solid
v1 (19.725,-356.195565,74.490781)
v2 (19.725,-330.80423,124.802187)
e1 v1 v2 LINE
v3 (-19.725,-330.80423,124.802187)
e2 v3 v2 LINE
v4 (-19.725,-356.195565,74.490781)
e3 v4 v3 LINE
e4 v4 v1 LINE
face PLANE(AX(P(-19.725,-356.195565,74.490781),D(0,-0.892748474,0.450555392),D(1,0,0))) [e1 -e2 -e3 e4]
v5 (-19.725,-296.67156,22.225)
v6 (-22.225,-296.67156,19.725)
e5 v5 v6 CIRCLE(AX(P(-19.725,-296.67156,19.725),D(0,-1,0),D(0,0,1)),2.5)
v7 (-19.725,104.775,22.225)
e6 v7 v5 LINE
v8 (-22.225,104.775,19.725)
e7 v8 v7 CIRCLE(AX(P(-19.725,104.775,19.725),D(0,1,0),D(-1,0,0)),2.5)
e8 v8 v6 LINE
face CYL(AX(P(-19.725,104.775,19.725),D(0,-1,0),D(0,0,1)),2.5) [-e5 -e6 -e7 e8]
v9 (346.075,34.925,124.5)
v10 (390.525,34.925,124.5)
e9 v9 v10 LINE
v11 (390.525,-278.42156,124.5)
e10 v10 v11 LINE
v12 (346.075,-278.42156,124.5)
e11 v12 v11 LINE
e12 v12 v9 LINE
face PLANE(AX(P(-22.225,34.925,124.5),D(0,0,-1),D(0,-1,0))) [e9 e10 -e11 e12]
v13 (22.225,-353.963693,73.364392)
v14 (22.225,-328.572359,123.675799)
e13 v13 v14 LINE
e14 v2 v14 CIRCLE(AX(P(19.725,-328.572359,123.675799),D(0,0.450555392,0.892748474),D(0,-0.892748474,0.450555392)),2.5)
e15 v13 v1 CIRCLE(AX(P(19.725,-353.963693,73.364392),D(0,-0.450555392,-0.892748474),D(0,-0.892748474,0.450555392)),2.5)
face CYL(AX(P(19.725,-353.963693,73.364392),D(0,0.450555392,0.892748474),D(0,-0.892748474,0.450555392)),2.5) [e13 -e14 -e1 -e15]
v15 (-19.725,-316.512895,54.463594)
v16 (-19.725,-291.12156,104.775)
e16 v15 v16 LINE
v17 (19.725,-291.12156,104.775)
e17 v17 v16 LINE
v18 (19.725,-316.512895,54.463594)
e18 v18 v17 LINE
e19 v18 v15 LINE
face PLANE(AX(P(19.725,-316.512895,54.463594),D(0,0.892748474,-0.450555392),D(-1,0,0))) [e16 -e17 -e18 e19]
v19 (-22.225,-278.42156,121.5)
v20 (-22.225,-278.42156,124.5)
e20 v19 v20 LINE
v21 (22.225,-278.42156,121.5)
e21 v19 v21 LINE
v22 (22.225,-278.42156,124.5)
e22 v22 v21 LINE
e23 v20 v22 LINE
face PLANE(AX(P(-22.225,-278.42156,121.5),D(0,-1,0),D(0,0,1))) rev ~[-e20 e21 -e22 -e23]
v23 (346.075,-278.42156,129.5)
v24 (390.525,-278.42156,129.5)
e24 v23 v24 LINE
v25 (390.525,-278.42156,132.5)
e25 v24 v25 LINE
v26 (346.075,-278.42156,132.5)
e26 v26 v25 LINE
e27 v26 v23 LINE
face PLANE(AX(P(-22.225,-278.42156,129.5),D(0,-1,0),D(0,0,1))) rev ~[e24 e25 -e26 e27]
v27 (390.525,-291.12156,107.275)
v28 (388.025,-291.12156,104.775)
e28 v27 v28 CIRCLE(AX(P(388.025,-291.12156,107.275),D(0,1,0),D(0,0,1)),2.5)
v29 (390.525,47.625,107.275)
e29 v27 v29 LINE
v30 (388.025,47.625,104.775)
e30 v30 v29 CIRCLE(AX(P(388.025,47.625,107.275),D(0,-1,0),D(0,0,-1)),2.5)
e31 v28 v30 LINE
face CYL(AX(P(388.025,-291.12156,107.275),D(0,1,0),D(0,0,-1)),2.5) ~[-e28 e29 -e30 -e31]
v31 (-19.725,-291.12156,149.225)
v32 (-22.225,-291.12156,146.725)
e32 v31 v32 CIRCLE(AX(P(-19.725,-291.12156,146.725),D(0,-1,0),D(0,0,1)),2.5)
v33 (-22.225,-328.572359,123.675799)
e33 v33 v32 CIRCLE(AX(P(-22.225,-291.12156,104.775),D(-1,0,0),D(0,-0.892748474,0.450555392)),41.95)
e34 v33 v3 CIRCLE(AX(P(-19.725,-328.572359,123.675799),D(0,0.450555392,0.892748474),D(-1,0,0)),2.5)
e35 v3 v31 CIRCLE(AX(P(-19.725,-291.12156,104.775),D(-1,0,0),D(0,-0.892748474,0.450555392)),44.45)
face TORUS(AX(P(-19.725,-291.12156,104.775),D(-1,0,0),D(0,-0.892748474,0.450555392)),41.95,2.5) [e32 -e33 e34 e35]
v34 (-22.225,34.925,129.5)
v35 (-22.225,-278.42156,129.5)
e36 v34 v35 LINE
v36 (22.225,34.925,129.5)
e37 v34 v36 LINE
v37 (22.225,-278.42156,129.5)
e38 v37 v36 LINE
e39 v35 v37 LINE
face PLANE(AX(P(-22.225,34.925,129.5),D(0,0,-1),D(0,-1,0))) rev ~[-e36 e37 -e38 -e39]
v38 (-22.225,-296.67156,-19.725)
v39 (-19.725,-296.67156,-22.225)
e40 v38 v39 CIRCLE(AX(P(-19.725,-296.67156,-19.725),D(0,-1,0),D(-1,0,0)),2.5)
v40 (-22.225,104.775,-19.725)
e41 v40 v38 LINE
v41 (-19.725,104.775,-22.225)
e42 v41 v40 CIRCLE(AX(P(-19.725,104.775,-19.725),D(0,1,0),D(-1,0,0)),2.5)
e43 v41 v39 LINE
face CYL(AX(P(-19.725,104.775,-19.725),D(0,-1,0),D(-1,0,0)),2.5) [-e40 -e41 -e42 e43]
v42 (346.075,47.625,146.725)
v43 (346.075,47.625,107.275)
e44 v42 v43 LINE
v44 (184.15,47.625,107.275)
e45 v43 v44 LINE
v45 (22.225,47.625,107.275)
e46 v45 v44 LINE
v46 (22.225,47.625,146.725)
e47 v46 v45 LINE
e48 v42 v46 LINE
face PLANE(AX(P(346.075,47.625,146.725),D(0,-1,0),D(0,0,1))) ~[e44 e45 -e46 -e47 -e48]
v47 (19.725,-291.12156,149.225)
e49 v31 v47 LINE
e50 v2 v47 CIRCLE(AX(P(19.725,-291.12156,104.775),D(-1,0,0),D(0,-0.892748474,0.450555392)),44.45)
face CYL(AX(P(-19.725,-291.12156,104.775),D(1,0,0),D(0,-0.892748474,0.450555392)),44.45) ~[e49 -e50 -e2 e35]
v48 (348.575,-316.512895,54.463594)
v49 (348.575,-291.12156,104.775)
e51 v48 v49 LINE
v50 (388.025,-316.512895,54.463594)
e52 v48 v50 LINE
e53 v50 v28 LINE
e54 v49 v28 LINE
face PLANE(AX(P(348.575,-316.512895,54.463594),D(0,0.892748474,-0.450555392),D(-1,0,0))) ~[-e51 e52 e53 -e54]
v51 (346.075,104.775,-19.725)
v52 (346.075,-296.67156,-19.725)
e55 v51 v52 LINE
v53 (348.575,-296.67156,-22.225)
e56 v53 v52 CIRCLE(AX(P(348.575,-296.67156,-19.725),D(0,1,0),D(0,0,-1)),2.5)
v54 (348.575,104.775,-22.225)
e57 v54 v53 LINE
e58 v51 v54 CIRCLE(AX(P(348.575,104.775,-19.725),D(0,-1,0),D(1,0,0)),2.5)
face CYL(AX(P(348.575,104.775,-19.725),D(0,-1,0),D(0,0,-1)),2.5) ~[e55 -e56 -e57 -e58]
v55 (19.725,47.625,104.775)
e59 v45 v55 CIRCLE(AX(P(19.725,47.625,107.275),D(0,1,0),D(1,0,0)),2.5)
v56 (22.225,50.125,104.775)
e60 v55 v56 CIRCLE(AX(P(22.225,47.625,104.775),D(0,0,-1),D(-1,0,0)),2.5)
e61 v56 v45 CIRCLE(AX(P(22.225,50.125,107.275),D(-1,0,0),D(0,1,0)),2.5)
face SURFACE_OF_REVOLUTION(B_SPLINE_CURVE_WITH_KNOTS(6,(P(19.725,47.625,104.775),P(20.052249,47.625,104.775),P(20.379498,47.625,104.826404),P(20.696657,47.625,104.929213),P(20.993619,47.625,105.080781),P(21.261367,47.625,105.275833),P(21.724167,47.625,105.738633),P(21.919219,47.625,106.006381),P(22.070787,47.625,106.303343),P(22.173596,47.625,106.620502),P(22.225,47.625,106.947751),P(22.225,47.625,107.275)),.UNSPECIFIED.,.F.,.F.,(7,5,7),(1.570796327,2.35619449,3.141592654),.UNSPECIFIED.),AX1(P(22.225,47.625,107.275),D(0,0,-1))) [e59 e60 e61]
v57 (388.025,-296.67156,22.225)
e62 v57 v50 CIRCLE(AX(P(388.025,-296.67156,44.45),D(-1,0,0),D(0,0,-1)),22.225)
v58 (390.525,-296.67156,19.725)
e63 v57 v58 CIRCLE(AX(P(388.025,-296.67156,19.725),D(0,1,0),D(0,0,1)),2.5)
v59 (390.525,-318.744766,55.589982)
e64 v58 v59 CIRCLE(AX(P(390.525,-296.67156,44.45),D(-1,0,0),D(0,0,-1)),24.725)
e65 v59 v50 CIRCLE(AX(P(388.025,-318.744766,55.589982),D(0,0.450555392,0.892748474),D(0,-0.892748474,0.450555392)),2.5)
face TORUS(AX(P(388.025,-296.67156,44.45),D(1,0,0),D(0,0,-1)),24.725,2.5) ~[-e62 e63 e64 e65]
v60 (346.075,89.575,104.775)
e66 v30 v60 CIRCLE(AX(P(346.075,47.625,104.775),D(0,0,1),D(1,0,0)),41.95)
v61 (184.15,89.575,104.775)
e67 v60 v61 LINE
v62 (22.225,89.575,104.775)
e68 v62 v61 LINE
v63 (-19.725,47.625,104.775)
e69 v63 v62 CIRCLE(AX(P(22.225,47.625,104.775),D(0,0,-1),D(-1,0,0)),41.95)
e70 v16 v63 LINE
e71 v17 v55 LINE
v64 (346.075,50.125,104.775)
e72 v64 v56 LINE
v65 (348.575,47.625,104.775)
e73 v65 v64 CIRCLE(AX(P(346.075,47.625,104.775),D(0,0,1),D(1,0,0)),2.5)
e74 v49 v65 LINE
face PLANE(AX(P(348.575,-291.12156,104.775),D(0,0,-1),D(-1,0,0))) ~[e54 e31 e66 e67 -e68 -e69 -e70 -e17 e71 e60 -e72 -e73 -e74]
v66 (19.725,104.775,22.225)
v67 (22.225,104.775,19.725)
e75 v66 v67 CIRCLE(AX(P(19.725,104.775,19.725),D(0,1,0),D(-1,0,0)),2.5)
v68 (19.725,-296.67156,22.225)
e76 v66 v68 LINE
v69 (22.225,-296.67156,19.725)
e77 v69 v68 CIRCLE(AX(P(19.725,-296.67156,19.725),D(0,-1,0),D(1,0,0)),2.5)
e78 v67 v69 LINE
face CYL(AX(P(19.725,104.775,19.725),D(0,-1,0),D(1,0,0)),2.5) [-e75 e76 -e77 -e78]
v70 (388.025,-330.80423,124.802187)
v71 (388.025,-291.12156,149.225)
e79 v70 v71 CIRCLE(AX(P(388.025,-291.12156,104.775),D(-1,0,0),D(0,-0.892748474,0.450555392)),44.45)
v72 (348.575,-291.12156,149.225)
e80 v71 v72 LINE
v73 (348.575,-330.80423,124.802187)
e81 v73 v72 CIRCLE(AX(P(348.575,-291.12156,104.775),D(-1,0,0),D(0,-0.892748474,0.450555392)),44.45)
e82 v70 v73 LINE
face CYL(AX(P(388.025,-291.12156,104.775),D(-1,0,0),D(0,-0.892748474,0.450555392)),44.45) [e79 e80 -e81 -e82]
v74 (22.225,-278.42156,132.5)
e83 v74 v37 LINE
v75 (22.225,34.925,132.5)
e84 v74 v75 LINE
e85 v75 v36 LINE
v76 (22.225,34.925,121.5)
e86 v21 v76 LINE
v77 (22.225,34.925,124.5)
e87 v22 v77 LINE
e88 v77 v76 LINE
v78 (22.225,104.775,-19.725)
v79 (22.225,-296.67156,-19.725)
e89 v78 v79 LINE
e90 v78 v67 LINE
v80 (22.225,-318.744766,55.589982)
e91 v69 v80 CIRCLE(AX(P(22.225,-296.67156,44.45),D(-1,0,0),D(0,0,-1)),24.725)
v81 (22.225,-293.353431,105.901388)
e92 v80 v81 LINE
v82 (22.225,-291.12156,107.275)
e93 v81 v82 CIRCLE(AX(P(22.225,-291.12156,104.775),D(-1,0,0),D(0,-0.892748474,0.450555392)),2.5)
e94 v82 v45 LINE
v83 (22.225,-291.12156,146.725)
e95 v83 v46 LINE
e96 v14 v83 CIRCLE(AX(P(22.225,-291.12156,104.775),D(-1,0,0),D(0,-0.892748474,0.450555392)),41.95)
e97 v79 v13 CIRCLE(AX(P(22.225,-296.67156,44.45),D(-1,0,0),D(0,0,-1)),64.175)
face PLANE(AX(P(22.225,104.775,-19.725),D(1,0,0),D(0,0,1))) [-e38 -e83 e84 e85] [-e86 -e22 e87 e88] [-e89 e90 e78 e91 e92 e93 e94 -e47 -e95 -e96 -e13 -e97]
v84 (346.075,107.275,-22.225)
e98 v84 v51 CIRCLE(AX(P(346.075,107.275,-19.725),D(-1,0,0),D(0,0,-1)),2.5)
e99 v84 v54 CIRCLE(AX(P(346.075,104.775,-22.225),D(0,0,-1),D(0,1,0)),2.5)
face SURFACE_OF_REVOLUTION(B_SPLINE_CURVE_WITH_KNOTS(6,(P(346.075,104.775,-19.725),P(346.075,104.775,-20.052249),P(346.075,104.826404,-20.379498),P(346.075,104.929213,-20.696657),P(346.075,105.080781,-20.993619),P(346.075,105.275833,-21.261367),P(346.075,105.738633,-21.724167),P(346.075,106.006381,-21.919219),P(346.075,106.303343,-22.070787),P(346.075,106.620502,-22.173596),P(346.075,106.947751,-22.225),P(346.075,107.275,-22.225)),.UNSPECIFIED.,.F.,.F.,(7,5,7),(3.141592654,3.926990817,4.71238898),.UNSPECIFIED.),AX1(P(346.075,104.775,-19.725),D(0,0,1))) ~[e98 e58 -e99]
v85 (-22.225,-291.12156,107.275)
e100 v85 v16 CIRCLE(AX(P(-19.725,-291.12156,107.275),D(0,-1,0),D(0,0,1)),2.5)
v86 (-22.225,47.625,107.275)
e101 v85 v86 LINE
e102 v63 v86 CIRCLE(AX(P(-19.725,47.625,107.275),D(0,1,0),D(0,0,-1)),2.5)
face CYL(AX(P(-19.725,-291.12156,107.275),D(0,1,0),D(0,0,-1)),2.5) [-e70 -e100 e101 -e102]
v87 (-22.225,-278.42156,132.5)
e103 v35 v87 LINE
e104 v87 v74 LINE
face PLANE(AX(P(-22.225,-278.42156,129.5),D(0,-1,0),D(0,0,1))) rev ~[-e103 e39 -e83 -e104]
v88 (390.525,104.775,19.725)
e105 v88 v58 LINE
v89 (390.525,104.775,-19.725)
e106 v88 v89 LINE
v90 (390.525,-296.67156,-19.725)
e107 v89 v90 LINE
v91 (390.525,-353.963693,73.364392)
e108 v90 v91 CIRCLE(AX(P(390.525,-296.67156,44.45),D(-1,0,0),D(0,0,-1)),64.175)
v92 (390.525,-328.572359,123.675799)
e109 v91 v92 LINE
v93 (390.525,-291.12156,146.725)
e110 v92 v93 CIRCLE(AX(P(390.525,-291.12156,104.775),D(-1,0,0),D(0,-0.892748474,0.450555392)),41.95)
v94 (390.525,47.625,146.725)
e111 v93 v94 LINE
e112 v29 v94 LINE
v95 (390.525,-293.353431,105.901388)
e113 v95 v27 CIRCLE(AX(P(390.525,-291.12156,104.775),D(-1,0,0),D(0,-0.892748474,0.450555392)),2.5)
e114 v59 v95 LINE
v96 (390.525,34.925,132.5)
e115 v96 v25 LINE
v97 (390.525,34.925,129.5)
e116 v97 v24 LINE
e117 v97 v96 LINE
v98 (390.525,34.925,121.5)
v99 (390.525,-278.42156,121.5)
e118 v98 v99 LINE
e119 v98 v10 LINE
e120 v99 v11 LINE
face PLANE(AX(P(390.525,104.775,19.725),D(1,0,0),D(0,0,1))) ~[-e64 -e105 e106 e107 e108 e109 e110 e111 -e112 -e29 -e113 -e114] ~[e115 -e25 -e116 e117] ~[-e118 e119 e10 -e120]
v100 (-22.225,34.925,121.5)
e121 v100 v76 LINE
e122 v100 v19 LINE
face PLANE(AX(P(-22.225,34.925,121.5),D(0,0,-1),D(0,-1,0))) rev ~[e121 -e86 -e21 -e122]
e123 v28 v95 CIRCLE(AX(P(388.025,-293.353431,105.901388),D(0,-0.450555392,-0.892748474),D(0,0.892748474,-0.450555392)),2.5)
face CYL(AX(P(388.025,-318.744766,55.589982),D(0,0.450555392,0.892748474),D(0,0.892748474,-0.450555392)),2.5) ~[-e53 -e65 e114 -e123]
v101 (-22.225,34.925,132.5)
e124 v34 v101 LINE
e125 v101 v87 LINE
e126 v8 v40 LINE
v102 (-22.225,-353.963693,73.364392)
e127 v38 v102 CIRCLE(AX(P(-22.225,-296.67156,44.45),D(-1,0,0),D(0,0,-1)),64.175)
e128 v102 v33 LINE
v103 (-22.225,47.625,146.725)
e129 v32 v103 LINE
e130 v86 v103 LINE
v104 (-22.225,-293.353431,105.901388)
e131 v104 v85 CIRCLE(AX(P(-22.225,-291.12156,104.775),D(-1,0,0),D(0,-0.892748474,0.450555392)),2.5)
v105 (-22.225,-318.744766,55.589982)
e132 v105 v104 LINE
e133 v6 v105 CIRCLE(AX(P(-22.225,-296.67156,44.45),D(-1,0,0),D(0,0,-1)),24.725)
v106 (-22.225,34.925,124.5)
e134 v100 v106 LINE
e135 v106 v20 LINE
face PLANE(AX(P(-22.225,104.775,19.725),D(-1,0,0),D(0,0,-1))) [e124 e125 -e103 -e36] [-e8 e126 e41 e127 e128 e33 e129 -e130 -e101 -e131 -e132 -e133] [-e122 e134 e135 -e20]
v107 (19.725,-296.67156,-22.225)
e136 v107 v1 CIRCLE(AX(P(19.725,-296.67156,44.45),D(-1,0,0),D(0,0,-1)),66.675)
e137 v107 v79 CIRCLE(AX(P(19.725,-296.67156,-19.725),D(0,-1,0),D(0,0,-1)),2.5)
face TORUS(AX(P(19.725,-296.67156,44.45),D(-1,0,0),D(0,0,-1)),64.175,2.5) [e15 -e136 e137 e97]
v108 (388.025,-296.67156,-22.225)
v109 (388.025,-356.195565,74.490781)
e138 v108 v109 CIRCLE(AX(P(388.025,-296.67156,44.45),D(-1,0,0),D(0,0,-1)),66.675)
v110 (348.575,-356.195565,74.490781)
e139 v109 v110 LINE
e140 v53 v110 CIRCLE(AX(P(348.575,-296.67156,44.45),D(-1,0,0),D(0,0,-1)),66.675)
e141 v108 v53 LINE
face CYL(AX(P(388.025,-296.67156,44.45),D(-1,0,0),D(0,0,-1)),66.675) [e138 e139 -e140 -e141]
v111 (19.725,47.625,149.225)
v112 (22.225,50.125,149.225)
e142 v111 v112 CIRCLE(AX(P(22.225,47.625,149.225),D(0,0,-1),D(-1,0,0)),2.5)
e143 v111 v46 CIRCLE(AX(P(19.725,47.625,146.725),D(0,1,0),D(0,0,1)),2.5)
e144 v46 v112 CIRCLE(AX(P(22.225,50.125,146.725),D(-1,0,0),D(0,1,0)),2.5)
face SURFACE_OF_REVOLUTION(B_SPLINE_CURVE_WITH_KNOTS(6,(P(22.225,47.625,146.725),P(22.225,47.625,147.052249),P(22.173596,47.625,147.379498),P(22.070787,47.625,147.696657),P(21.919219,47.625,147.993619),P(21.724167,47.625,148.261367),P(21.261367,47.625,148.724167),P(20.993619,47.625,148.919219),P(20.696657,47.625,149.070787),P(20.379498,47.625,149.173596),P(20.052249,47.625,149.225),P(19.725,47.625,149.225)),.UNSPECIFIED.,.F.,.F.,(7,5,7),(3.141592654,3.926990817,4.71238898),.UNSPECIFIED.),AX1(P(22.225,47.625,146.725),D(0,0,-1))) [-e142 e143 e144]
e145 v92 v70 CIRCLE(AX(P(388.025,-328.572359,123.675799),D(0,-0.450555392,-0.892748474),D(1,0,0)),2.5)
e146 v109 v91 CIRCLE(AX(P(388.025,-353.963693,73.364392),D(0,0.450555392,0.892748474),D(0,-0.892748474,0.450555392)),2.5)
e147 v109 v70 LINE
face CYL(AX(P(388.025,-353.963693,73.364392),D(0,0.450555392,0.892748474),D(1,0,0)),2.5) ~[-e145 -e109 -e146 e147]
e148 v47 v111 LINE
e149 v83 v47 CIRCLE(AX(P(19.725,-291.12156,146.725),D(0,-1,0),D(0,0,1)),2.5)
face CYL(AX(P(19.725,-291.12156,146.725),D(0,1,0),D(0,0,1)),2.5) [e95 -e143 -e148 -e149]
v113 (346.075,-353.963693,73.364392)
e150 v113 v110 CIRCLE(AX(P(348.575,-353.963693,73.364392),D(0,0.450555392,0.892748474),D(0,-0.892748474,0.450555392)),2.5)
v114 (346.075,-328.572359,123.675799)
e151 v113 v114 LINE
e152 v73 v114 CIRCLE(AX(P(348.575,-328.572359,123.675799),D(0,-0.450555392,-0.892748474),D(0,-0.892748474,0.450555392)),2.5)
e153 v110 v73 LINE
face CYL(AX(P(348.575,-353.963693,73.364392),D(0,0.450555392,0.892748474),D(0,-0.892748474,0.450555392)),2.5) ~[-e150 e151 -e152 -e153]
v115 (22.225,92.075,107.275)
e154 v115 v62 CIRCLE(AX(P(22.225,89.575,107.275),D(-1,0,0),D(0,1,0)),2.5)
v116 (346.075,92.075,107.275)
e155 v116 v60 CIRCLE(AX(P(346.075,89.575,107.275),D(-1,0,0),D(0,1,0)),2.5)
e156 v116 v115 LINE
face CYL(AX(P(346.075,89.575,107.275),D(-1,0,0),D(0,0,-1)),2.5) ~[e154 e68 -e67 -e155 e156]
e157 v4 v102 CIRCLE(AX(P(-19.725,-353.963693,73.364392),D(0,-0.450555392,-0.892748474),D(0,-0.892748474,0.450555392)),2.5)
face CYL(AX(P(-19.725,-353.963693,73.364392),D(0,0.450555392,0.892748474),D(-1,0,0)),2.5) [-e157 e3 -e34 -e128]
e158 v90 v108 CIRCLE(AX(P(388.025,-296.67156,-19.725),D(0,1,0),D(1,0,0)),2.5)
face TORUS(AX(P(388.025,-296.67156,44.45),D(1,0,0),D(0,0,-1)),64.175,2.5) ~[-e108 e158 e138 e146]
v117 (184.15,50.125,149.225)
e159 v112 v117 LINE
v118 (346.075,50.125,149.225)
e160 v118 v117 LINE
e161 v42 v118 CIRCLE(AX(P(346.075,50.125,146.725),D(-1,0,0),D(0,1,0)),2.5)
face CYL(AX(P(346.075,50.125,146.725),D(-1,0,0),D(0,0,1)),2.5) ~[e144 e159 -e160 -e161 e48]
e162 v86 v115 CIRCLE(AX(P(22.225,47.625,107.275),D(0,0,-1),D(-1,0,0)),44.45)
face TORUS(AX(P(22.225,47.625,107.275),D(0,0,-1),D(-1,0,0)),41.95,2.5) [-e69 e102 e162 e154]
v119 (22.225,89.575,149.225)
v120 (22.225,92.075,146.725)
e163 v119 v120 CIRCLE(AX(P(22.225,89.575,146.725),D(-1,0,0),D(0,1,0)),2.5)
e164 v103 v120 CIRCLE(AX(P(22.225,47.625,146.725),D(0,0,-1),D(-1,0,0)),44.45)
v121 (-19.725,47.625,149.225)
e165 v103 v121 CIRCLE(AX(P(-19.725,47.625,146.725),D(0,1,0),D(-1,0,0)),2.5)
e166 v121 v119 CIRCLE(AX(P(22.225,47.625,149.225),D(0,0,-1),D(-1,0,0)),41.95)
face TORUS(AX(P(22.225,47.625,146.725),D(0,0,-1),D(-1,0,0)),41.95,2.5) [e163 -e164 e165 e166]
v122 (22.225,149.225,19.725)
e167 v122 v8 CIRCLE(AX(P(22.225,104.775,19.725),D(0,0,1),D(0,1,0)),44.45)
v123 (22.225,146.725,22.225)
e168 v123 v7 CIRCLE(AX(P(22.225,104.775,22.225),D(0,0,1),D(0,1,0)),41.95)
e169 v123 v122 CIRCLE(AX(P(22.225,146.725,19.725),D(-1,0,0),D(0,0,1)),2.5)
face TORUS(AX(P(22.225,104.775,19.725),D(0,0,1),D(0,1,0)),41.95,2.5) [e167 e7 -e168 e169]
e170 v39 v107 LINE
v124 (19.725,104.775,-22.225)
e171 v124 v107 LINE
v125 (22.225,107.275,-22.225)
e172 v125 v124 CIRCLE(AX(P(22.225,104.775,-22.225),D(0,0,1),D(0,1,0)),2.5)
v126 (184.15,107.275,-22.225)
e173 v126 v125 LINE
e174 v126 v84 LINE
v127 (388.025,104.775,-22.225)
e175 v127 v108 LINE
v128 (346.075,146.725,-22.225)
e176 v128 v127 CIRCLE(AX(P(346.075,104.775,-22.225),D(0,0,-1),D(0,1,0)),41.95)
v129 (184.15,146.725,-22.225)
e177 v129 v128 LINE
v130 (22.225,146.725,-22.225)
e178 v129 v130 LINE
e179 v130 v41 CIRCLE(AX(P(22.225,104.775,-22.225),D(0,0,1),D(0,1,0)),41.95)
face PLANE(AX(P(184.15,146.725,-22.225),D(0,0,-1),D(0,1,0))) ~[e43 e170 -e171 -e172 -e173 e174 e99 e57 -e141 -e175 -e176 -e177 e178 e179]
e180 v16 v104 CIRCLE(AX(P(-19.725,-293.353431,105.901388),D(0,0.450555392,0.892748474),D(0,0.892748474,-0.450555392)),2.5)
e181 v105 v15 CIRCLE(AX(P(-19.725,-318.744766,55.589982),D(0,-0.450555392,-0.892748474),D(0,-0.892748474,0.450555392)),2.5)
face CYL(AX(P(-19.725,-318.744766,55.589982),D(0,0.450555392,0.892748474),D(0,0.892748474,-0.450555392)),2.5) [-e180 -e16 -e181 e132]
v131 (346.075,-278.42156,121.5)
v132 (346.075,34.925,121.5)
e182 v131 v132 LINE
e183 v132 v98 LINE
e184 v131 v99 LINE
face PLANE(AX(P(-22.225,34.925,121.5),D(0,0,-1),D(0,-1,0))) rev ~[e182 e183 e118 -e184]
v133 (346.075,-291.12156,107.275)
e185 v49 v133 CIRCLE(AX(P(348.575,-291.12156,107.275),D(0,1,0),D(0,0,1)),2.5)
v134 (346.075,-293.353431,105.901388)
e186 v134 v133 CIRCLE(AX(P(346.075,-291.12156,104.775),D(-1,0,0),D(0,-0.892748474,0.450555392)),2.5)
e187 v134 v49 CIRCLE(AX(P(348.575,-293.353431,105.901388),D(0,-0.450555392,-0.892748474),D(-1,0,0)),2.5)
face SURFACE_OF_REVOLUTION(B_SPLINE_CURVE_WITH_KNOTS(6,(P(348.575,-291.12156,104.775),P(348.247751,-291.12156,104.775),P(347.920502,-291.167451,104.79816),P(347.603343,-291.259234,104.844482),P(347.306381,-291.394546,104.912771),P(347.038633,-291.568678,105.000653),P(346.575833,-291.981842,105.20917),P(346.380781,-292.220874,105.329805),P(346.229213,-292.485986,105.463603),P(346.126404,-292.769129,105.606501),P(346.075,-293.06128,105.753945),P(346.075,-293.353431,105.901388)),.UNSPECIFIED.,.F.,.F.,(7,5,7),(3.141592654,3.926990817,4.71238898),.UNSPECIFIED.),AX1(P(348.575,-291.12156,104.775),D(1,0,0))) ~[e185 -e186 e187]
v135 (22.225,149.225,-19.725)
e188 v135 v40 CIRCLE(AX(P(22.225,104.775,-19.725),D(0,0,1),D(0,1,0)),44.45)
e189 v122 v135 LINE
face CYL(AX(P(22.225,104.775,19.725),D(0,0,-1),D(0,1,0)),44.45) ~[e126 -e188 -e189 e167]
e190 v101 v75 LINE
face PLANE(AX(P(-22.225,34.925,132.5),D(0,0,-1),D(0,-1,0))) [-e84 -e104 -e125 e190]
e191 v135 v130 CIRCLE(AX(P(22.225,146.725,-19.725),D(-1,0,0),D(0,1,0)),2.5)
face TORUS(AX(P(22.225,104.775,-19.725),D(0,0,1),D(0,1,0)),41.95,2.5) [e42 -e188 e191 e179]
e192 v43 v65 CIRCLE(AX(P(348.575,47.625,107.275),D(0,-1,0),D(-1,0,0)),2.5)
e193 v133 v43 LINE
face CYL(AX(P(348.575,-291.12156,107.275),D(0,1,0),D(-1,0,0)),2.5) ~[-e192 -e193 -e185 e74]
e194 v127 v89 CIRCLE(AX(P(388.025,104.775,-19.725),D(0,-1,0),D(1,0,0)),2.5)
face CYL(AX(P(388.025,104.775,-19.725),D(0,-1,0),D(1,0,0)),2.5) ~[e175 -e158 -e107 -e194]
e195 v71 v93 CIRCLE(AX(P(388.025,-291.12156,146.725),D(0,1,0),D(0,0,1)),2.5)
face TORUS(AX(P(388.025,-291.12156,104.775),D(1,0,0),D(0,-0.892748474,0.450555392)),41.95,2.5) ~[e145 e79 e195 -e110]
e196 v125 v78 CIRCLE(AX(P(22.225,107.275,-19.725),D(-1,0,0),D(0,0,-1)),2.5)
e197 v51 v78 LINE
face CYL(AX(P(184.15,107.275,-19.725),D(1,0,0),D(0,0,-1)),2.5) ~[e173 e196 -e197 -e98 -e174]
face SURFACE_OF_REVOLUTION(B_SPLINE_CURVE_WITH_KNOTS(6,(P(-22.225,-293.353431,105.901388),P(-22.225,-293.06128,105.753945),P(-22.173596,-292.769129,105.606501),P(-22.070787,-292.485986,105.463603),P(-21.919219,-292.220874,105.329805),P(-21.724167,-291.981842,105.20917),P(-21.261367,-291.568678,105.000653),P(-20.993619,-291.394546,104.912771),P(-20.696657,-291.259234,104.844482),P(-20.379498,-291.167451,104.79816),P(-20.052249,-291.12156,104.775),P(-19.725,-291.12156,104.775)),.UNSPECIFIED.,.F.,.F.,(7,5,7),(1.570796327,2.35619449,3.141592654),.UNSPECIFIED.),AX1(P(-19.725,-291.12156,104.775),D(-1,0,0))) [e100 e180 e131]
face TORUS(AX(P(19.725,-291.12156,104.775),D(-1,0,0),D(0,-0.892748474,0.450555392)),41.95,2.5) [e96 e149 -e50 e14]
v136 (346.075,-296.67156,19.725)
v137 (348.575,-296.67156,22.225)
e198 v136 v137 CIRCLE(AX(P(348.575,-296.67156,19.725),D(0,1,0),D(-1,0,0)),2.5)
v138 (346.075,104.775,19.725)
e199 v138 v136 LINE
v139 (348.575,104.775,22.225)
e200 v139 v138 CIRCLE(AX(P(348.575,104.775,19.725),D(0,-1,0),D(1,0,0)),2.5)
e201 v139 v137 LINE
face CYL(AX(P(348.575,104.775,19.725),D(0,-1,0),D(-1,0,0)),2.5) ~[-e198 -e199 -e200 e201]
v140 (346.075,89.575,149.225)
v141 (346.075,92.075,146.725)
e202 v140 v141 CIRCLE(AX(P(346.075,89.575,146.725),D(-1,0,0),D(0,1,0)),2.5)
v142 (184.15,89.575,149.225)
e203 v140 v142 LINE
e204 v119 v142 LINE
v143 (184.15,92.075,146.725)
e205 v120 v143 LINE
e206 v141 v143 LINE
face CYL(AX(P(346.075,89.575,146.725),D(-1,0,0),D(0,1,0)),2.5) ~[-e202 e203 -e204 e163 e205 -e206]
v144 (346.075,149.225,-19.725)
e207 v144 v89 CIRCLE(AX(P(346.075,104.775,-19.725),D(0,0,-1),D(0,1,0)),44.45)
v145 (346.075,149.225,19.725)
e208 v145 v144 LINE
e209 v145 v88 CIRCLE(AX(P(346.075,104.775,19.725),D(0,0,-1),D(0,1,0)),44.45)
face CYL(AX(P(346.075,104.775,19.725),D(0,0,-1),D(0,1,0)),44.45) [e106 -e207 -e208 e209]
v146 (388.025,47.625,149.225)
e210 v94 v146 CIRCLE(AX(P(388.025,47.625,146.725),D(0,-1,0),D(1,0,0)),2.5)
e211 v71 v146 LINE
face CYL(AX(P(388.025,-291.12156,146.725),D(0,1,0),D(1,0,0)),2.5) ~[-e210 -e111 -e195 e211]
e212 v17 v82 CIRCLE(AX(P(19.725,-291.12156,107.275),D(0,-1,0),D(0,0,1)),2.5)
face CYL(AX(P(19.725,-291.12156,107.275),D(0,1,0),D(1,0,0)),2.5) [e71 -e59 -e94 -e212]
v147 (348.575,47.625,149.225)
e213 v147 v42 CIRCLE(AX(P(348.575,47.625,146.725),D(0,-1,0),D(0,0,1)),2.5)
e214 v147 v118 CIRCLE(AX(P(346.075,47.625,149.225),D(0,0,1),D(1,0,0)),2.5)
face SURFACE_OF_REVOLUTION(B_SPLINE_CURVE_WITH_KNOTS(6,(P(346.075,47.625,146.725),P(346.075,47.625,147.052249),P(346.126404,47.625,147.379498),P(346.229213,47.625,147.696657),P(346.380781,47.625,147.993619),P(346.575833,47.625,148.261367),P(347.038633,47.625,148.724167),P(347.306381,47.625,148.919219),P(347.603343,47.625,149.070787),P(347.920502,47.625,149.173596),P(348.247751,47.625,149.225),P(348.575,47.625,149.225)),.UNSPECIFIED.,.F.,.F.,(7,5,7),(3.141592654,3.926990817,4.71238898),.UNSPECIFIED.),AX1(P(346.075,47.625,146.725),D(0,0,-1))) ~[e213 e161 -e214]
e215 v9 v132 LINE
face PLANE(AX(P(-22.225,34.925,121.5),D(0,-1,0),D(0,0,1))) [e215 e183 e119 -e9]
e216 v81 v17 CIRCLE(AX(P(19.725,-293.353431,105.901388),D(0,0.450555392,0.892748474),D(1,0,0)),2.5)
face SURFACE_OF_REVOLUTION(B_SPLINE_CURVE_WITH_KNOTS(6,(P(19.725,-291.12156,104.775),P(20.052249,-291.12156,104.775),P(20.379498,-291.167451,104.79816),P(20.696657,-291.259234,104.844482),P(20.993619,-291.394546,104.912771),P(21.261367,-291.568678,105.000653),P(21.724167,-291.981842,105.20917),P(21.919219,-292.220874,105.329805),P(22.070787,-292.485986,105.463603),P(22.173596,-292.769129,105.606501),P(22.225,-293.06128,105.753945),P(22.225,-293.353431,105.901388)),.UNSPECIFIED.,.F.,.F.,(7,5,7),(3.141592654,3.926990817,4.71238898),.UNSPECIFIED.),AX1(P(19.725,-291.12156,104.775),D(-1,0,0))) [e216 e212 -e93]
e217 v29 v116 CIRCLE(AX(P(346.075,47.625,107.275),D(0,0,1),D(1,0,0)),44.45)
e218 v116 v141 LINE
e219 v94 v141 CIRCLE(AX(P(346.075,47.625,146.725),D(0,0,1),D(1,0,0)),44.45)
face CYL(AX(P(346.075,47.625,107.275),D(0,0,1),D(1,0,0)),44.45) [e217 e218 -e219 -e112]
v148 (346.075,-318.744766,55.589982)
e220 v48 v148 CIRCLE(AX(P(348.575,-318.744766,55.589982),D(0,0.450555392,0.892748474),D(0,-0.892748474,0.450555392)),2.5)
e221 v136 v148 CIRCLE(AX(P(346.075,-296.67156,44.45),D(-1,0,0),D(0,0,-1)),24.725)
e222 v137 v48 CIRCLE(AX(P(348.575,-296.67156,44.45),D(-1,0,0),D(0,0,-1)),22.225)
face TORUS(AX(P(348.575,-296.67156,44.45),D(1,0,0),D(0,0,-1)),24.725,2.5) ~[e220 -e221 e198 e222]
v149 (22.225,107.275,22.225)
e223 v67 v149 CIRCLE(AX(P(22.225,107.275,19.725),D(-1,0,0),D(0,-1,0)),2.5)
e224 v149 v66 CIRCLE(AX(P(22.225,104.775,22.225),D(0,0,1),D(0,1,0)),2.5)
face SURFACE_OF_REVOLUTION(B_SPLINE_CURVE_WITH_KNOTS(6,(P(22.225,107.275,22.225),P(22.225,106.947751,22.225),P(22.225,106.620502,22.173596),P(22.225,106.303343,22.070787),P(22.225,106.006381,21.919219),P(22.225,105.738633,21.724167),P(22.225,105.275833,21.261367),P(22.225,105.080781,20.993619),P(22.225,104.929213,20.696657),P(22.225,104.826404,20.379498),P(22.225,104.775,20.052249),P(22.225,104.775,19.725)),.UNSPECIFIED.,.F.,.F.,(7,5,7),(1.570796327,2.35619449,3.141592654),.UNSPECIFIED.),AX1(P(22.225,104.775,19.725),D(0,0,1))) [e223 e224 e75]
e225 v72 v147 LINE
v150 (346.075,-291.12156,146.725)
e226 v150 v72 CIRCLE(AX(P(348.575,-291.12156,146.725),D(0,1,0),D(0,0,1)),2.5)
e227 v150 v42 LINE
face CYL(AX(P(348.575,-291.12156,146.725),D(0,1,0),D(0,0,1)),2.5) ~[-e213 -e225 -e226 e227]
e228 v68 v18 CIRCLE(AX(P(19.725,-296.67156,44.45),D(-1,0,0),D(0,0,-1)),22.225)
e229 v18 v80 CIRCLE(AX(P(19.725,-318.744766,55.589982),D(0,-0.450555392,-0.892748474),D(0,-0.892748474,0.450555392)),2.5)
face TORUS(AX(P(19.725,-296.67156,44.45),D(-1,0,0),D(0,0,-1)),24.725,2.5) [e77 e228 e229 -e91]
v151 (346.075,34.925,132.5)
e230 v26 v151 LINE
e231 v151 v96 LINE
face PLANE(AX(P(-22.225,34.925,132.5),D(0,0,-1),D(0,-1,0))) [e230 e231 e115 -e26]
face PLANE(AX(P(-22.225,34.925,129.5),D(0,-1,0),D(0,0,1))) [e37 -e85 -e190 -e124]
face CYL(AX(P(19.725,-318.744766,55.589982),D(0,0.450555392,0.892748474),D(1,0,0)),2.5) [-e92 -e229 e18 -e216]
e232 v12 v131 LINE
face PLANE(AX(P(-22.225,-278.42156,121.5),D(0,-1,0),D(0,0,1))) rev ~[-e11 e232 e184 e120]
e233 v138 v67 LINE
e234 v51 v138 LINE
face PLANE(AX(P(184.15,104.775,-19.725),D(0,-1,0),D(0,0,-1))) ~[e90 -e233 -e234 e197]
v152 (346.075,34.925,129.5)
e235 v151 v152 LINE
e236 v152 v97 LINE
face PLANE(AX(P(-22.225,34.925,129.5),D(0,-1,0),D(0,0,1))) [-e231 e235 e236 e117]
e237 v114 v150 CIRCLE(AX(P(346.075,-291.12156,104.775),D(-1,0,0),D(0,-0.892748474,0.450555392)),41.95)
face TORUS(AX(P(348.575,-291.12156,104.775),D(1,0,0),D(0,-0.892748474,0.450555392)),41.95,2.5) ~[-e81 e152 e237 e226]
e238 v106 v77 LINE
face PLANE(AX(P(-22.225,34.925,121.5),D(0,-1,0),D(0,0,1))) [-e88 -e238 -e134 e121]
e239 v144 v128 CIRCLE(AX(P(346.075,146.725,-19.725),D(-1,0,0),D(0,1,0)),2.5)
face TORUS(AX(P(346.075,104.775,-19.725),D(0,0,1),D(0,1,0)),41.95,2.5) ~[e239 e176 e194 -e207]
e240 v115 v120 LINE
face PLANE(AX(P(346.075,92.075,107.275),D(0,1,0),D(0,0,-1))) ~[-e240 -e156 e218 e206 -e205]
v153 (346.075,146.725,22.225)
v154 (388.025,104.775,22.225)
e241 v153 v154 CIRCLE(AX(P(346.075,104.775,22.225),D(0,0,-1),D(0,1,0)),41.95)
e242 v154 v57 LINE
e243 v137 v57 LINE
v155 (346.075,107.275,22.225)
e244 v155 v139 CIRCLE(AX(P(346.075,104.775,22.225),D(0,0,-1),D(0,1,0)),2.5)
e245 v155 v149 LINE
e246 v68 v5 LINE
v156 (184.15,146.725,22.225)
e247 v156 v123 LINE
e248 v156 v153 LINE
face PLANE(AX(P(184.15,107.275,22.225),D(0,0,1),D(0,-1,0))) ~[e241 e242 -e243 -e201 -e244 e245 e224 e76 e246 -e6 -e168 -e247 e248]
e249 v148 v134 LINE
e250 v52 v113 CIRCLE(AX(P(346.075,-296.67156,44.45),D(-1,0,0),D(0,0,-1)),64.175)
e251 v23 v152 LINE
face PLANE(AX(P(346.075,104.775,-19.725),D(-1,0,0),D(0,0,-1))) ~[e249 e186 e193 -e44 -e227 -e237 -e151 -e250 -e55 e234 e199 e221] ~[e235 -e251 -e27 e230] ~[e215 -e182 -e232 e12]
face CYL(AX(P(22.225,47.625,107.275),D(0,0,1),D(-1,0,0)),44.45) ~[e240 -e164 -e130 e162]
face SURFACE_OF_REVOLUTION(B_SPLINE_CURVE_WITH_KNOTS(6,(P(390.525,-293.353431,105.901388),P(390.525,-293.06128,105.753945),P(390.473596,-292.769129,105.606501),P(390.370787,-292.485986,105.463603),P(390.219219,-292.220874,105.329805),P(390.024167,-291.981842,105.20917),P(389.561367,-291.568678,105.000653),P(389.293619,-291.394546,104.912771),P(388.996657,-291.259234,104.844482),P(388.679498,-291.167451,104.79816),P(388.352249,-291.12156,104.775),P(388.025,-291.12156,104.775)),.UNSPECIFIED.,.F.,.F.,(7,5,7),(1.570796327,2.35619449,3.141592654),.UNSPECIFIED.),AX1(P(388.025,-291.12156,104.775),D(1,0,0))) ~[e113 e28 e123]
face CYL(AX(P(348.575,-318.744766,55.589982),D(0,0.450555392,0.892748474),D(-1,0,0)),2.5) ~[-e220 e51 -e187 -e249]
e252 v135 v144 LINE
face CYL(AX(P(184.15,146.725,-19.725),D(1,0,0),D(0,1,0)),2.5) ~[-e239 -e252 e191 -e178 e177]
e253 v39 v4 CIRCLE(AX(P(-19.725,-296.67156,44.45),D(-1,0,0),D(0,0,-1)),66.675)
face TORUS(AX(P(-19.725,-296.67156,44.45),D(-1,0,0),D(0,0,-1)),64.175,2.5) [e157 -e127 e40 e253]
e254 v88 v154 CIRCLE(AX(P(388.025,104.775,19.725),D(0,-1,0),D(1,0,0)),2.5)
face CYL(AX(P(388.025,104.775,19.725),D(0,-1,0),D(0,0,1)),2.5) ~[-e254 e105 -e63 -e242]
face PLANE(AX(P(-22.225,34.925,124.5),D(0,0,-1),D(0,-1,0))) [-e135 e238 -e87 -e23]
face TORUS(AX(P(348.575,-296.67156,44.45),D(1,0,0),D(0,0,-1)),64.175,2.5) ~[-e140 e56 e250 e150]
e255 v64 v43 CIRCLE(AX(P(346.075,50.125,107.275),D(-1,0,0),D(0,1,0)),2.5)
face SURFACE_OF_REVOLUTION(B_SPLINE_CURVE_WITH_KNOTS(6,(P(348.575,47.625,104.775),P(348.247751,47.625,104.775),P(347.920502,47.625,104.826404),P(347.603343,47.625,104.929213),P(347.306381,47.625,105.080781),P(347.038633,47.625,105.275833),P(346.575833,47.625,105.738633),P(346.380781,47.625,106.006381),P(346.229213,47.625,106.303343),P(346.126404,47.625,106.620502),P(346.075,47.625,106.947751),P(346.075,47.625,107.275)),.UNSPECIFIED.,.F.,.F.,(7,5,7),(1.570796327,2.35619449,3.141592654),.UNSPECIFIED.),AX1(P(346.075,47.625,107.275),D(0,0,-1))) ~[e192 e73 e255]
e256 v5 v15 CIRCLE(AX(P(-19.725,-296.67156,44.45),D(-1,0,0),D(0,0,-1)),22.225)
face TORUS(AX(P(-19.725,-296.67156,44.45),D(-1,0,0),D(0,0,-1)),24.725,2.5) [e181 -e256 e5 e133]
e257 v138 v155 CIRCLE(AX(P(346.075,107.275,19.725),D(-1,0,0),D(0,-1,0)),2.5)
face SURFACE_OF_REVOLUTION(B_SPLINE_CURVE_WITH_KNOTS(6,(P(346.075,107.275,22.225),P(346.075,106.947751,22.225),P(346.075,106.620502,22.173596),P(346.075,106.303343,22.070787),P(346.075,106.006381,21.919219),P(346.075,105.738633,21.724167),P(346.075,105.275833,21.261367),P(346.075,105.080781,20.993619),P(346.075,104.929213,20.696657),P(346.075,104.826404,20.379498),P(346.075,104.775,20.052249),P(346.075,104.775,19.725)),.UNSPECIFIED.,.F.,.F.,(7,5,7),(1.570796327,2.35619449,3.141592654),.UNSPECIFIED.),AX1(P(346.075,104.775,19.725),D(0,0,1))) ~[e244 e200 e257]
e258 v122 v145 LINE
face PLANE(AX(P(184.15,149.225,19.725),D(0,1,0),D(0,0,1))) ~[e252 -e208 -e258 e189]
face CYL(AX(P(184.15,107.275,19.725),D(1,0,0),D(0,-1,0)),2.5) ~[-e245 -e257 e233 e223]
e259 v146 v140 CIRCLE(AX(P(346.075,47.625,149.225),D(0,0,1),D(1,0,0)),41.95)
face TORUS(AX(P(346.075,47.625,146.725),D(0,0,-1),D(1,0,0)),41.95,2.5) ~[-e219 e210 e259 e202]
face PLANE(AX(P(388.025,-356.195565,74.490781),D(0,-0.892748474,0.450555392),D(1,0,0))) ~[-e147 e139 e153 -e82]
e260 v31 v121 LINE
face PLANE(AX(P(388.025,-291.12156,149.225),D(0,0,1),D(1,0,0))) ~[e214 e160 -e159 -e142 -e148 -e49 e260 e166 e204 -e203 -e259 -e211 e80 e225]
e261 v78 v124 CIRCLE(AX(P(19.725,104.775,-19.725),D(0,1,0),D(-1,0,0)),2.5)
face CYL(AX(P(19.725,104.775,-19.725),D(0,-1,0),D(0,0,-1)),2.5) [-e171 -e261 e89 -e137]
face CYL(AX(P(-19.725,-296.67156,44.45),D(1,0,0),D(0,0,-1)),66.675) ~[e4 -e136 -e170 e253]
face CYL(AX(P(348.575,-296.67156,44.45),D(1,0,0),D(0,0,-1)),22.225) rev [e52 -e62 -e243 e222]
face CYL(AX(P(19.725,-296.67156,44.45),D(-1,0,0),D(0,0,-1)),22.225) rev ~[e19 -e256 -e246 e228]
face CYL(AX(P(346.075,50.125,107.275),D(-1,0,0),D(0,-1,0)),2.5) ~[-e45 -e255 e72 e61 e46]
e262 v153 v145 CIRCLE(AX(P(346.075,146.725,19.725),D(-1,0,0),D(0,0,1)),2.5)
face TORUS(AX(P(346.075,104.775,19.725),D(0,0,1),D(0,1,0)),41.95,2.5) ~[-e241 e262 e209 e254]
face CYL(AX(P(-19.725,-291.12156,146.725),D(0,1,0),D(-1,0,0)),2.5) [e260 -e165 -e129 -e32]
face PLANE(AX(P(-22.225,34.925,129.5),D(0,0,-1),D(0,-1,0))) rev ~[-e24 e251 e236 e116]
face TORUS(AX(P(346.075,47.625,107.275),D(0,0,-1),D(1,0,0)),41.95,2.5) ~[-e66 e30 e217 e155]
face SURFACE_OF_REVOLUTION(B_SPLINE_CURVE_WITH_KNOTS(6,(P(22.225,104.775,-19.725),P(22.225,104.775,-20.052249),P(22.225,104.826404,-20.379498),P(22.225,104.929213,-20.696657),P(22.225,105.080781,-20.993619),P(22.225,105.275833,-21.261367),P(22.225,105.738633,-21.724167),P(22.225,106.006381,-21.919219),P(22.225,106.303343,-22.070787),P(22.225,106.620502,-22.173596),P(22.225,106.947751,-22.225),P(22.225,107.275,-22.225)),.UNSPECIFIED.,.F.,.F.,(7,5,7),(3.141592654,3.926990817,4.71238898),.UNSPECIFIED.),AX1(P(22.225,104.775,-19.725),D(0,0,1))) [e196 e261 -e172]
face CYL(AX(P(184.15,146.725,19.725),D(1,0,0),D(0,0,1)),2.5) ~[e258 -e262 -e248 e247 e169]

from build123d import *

# Parameters (mm, degrees)
F7_W          = 313.3465600376
F7_H          = 3
F8_DEPTH      = 412.7510001
F8_DEPTH_BACK = 908


# Not quite as in the source:
# - an extrude ends at something that could not be found from the text; its depth is read off the source's solid


with BuildPart() as f5:
    # F5: sweep along a path in F1, F0, F3
    with BuildLine(Plane.XY) as f5_path:
        Line((184.15, 127), (22.225, 127))
        ThreePointArc((22.225, 127), (6.5095517881, 120.4904482119), (0, 104.775))
        Line((0, 104.775), (0, 0))
    with BuildLine(Plane.YZ) as f5_path_2:
        Line((0, 0), (-296.6715600376, 0))
        ThreePointArc((-296.6715600376, 0), (-334.5266189482, 21.1519954744), (-336.3542297256, 64.4771871822))
        Line((-336.3542297256, 64.4771871822), (-310.9628948816, 114.7885935911))
        ThreePointArc((-310.9628948816, 114.7885935911), (-302.7705623004, 123.7025294553), (-291.1215600376, 127))
        Line((-291.1215600376, 127), (-57.15, 127))
    with BuildLine(Plane.XY.offset(127)) as f5_path_3:
        Line((0, -57.15), (0, 47.625))
        ThreePointArc((0, 47.625), (6.5095517881, 63.3404482119), (22.225, 69.85))
        Line((22.225, 69.85), (184.15, 69.85))
    # F4 (on Front) → F5 (sweep)
    with BuildSketch(Plane.XZ):
        with BuildLine():
            Line((-19.725, -22.225), (19.725, -22.225))
            ThreePointArc((19.725, -22.225), (21.492766953, -21.492766953), (22.225, -19.725))
            Line((22.225, -19.725), (22.225, 19.725))
            ThreePointArc((22.225, 19.725), (21.492766953, 21.492766953), (19.725, 22.225))
            Line((19.725, 22.225), (-19.725, 22.225))
            ThreePointArc((-19.725, 22.225), (-21.492766953, 21.492766953), (-22.225, 19.725))
            Line((-22.225, 19.725), (-22.225, -19.725))
            ThreePointArc((-22.225, -19.725), (-21.492766953, -21.492766953), (-19.725, -22.225))
        make_face()
    sweep(path=f5_path.line + f5_path_2.line + f5_path_3.line)

    # F6: F5 across face


with BuildPart() as f5_1:
    add(f5.part)
    add(f5.part.mirror(Plane(origin=(184.15, 127, 0), x_dir=(0, 1, 0), z_dir=(1, 0, 0))))

    # F7 (on face) → F8 (cut, two sides)
    with BuildSketch(Plane(origin=(-22.225, 0, 0), x_dir=(0, -1, 0), z_dir=(-1, 0, 0))) as f8_sk:
        with Locations((121.7482800188, 123)):
            Rectangle(F7_W, F7_H)
        with Locations((121.7482800188, 131)):
            Rectangle(F7_W, F7_H)
    extrude(amount=-F8_DEPTH, mode=Mode.SUBTRACT)
    extrude(f8_sk.sketch, amount=F8_DEPTH_BACK, mode=Mode.SUBTRACT)


solid = f5_1.part
